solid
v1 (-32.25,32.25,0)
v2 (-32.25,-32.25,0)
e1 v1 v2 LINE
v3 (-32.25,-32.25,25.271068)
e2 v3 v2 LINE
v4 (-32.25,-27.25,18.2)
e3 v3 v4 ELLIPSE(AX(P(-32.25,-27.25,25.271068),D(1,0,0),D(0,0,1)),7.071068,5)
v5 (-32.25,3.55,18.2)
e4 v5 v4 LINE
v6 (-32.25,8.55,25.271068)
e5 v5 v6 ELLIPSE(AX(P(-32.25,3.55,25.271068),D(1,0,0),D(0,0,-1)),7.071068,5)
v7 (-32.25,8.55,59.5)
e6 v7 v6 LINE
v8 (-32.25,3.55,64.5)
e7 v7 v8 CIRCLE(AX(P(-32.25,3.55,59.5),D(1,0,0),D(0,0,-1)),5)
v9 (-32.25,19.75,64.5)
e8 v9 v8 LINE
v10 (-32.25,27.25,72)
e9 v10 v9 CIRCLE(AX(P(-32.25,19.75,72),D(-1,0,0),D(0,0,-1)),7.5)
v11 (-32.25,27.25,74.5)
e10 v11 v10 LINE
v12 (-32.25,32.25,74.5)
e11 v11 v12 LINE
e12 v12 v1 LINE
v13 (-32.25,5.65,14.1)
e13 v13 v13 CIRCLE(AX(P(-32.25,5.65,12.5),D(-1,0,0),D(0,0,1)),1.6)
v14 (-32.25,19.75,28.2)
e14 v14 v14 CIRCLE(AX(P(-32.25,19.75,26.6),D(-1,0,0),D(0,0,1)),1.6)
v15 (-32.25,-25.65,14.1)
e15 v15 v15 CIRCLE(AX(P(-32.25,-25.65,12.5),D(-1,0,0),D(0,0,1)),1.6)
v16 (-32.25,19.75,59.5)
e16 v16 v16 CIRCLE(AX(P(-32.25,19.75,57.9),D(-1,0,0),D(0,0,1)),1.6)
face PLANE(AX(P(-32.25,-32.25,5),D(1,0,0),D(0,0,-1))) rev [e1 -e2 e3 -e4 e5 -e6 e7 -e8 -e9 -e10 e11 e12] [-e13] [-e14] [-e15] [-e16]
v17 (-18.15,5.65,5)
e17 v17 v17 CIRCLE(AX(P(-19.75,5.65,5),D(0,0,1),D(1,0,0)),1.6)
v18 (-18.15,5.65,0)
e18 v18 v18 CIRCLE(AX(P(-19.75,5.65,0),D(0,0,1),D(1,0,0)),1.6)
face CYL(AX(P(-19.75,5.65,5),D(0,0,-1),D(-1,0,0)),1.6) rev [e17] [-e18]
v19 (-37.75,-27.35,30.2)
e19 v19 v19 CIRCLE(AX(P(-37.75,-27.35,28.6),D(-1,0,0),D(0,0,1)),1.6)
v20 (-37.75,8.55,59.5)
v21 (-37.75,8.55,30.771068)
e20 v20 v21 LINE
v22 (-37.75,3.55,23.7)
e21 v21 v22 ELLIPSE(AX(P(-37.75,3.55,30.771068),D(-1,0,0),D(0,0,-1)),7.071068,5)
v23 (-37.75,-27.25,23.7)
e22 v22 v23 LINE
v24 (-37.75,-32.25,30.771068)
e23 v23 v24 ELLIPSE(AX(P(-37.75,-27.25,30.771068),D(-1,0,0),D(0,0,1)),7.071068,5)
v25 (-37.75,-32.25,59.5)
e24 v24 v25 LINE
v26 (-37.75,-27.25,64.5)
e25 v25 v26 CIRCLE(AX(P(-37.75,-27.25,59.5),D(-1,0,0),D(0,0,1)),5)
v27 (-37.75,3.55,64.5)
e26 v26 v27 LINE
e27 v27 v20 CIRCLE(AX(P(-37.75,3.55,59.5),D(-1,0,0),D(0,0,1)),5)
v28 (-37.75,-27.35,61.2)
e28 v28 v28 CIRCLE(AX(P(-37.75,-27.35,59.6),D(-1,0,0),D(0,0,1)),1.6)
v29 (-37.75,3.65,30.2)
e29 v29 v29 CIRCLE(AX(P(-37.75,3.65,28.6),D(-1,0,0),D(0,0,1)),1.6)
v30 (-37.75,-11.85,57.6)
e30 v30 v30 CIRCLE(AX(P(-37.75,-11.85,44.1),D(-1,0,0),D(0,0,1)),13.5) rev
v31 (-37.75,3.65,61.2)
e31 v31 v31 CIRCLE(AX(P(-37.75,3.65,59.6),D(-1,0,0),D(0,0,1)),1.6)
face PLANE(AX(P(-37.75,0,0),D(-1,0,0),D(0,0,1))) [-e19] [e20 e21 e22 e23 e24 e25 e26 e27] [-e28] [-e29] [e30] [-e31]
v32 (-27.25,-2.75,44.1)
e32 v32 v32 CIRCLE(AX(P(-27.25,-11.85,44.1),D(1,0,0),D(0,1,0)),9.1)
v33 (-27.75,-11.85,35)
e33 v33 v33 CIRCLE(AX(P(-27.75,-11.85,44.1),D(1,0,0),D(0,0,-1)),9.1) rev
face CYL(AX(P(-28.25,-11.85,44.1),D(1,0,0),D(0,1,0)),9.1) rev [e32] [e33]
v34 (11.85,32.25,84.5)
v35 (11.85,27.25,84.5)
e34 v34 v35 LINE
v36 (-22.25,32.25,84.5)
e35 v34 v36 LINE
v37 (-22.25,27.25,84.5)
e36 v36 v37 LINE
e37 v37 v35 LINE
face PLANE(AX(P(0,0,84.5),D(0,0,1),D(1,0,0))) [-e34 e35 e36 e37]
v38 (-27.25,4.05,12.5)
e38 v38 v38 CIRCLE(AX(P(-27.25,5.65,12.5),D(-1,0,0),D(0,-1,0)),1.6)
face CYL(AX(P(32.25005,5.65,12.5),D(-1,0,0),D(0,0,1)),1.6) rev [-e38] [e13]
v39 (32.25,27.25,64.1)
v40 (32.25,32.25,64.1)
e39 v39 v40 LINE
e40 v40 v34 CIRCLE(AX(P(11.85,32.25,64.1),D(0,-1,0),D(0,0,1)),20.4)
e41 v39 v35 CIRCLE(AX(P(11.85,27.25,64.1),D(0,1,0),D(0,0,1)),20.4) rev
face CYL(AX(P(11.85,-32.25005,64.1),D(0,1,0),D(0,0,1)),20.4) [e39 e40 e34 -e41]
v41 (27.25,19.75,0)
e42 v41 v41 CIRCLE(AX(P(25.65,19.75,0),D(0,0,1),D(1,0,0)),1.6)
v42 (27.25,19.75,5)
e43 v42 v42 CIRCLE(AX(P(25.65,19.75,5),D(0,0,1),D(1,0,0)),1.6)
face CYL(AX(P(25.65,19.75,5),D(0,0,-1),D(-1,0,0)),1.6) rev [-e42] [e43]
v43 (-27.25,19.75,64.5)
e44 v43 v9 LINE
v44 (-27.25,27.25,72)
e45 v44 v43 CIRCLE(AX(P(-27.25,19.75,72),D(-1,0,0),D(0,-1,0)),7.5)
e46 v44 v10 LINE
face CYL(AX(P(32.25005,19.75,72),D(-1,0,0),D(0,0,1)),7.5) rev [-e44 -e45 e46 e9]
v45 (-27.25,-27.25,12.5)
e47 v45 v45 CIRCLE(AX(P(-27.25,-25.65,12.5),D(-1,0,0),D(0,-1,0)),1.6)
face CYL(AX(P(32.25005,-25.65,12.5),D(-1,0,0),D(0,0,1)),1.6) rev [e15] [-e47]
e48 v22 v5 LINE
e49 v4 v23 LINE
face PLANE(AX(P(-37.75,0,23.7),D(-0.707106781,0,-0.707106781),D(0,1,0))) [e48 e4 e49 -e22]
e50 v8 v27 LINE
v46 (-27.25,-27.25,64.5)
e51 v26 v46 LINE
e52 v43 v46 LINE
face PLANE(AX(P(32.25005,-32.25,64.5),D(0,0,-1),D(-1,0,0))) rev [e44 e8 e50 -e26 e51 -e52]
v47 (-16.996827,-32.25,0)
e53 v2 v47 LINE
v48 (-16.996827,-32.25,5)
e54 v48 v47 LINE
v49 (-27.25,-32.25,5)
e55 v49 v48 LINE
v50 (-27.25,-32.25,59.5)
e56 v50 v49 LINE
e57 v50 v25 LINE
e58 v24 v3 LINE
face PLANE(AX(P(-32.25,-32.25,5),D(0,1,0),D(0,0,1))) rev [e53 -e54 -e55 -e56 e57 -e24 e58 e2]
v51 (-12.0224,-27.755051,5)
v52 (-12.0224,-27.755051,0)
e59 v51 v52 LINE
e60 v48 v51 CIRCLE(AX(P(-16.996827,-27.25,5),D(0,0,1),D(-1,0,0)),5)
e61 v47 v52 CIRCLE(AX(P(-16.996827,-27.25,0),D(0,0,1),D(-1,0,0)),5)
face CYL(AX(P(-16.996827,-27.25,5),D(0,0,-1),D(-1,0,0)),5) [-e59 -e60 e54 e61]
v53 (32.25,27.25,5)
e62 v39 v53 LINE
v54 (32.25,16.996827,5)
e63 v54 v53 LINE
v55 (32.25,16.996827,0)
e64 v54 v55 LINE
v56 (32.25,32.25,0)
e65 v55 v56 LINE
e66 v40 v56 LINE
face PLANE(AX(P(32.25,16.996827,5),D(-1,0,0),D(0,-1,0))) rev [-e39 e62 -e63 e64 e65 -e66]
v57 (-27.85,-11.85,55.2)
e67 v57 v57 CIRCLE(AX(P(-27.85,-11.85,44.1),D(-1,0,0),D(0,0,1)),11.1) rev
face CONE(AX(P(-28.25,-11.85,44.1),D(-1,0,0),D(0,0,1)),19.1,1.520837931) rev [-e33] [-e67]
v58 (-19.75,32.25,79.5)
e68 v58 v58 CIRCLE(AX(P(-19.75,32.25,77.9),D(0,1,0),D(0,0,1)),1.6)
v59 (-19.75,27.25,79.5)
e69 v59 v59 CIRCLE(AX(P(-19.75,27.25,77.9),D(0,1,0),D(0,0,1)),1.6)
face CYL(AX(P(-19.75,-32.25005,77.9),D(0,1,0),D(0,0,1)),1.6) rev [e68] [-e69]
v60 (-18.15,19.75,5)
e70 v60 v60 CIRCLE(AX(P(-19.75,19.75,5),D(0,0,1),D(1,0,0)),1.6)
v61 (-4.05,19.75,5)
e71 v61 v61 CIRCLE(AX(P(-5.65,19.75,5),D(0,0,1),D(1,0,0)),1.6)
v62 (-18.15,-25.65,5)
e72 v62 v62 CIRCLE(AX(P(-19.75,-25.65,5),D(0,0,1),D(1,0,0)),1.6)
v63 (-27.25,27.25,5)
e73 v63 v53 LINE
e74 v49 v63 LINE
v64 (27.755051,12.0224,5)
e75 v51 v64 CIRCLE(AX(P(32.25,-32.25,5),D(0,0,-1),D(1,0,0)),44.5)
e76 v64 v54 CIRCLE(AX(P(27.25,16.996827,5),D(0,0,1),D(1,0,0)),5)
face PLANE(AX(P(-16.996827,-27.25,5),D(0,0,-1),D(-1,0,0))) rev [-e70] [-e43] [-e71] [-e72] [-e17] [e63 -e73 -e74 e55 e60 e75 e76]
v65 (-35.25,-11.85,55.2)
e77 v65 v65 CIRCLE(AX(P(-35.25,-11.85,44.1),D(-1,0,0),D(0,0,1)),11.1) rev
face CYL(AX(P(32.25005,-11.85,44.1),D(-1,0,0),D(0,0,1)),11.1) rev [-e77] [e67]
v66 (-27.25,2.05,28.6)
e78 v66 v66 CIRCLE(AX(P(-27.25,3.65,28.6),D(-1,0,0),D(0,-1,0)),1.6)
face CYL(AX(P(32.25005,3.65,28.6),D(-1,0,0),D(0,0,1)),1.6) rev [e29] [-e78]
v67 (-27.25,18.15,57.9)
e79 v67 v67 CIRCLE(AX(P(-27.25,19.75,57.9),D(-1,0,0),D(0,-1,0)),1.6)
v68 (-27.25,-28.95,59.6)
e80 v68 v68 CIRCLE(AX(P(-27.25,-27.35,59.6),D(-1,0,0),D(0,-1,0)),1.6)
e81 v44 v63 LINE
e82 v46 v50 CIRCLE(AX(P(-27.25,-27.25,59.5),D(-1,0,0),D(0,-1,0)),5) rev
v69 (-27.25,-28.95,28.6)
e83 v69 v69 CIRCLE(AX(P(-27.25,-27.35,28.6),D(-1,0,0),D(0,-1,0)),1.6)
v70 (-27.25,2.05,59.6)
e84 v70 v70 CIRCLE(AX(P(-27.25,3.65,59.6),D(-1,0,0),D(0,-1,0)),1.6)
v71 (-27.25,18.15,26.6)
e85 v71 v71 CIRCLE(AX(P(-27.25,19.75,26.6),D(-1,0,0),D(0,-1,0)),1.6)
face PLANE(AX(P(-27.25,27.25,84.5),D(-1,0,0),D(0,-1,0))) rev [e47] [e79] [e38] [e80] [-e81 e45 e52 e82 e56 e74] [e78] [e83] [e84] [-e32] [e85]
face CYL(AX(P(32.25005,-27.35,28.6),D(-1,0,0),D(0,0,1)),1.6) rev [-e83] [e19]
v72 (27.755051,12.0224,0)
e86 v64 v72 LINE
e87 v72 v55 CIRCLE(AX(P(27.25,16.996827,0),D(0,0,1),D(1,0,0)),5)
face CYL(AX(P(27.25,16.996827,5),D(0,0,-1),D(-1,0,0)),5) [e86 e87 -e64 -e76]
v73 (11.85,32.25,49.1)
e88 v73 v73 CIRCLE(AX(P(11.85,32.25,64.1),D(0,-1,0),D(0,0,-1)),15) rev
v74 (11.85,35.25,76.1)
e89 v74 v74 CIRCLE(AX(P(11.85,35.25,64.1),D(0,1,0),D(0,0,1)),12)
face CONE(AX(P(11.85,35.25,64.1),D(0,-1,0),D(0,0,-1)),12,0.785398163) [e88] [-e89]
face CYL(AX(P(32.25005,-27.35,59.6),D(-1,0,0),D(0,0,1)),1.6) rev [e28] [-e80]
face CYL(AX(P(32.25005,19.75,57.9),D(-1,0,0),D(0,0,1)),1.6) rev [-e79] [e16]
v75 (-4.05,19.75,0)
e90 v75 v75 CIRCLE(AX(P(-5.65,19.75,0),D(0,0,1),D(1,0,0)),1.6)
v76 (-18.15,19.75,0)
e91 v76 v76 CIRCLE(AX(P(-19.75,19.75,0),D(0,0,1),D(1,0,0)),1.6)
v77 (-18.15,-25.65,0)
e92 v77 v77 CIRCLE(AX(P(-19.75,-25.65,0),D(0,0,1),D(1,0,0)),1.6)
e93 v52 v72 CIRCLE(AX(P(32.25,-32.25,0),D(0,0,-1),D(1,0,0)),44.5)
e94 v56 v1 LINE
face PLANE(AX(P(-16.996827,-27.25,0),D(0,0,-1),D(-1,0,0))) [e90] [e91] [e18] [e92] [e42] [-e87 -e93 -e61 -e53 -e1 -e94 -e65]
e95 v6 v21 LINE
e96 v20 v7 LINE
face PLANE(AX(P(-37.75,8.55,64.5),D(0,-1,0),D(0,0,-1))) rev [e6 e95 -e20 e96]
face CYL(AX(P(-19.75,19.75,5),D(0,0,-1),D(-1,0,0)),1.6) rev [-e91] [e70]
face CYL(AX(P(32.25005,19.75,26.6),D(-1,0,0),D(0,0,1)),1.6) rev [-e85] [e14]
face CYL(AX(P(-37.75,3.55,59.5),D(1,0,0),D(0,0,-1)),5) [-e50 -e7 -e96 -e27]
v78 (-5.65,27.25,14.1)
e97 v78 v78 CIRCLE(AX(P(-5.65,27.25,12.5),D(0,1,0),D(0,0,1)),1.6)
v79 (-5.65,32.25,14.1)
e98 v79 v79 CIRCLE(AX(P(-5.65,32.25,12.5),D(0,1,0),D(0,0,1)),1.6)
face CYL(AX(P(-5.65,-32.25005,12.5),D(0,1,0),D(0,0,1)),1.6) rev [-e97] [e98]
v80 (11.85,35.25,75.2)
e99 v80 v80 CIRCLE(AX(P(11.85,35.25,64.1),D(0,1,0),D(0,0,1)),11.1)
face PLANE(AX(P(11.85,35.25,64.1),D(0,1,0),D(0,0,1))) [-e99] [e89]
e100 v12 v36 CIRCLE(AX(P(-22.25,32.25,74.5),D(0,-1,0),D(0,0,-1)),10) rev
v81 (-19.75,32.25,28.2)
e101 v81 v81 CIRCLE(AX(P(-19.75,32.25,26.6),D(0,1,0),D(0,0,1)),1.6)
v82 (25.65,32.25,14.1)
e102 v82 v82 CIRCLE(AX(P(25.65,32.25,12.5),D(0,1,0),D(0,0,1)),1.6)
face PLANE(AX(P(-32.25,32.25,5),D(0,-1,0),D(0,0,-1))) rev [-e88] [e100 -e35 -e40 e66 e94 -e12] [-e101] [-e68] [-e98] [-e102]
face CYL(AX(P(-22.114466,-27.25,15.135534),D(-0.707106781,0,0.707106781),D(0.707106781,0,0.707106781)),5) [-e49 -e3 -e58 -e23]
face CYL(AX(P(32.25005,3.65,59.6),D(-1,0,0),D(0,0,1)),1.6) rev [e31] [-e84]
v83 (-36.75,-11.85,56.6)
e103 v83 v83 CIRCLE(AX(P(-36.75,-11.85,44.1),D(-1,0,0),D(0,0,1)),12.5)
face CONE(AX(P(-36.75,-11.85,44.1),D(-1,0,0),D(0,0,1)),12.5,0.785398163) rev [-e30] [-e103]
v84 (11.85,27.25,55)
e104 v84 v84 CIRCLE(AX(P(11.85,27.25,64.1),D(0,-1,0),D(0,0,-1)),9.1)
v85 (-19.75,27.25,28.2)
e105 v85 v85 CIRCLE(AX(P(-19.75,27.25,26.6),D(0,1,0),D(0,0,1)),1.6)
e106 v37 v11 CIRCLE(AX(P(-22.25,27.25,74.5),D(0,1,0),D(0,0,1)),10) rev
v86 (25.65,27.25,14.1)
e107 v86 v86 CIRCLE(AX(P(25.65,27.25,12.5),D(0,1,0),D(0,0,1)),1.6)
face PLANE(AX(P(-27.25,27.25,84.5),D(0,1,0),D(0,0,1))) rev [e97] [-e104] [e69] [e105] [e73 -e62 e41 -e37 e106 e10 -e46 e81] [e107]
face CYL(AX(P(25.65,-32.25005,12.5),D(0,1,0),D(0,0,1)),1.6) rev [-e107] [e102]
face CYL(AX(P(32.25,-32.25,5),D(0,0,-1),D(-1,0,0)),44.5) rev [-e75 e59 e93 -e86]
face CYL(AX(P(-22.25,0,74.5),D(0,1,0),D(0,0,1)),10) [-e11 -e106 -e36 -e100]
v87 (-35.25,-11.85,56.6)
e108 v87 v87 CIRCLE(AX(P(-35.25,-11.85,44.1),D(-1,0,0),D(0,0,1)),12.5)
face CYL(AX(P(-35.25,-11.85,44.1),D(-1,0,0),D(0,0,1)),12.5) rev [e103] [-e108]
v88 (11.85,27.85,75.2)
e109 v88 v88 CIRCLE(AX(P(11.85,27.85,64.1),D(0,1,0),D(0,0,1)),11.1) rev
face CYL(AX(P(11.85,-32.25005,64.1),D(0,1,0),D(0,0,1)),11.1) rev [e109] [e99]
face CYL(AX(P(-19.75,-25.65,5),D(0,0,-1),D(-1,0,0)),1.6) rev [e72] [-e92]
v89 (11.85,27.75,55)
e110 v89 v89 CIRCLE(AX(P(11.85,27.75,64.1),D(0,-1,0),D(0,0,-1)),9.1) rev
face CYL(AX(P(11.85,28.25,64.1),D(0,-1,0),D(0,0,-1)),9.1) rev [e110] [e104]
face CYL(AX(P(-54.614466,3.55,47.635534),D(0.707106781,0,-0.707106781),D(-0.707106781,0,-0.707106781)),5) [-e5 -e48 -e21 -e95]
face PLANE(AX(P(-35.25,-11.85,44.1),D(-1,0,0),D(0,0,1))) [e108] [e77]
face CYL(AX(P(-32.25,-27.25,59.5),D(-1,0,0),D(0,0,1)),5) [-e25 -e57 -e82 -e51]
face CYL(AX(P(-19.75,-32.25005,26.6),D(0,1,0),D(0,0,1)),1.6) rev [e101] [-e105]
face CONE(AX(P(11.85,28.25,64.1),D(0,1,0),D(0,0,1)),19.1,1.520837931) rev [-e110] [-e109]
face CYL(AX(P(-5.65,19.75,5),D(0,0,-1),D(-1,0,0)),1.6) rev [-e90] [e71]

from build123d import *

# Parameters (mm, degrees)
SKETCH1_R           = 1.6
BOSS_EXTRUDE1_DEPTH = 5
BOSS_EXTRUDE2_DEPTH = 79.5
SKETCH3_R           = 11.1
CUT_EXTRUDE1_DEPTH  = 112.08808442
BOSS_EXTRUDE3_START = 3
SKETCH4_R           = 15
SKETCH4_R_2         = 11.1
BOSS_EXTRUDE3_DEPTH = 3
CHAMFER1_SIZE       = 3
BOSS_EXTRUDE4_START = -1
SKETCH5_R           = 11.1
SKETCH5_R_2         = 9.1
BOSS_EXTRUDE4_DEPTH = 1
CHAMFER2_SIZE       = 10
CHAMFER2_SIZE_2     = 0.5
SKETCH6_R           = 1.6
CUT_EXTRUDE2_DEPTH  = 112.08808442
SKETCH7_R           = 11.1
SKETCH7_R_2         = 1.6
CUT_EXTRUDE3_DEPTH  = 112.995814654
BOSS_EXTRUDE5_START = -1
SKETCH8_R           = 11.1
SKETCH8_R_2         = 9.1
BOSS_EXTRUDE5_DEPTH = 1
CHAMFER3_SIZE       = 10
CHAMFER3_SIZE_2     = 0.5
BOSS_EXTRUDE6_START = 5.5
SKETCH9_R           = 1.6
SKETCH9_R_2         = 11.1
BOSS_EXTRUDE6_DEPTH = 5.5
SKETCH10_R          = 12.5
CUT_EXTRUDE4_DEPTH  = 2.5
CHAMFER6_SIZE       = 1
CHAMFER5_SIZE       = 5.5
FILLET4_R           = 5
FILLET5_R           = 5
FILLET6_R           = 5
FILLET7_R           = 5
FILLET1_R           = 10


# Some blends are built 0.0001 mm under size
with BuildPart() as part:
    # Sketch1 → Boss-Extrude1 (new body)
    with BuildSketch(Plane.XY):
        with BuildLine():
            Line((-32.25, -32.25), (-16.996827309, -32.25))
            ThreePointArc((-16.996827309, -32.25), (-13.644608083, -30.959801378), (-12.022400308, -27.755050505))
            ThreePointArc((-12.022400308, -27.755050505), (0.783748237, -0.783748237), (27.755050505, 12.022400308))
            ThreePointArc((27.755050505, 12.022400308), (30.959801378, 13.644608083), (32.25, 16.996827309))
            Line((32.25, 16.996827309), (32.25, 32.25))
            Line((32.25, 32.25), (-32.25, 32.25))
            Line((-32.25, 32.25), (-32.25, -32.25))
        make_face()
        with Locations((-19.75, 19.75)):
            Circle(SKETCH1_R, mode=Mode.SUBTRACT)
        with Locations((-5.65, 19.75)):
            Circle(SKETCH1_R, mode=Mode.SUBTRACT)
        with Locations((25.65, 19.75)):
            Circle(SKETCH1_R, mode=Mode.SUBTRACT)
        with Locations((-19.75, 5.65)):
            Circle(SKETCH1_R, mode=Mode.SUBTRACT)
        with Locations((-19.75, -25.65)):
            Circle(SKETCH1_R, mode=Mode.SUBTRACT)
    extrude(amount=BOSS_EXTRUDE1_DEPTH)

    # Sketch2 → Boss-Extrude2 (add)
    with BuildSketch(Plane.XY.offset(5)):
        Polygon((-32.25, 32.25), (32.25, 32.25), (32.25, 27.25), (-27.25, 27.25), (-27.25, -32.25), (-32.25, -32.25), (-32.25, 27.25), align=None)
    extrude(amount=BOSS_EXTRUDE2_DEPTH)

    # Sketch3 → Cut-Extrude1 (cut, through all)
    with BuildSketch(Plane(origin=(0, 32.25, 0), x_dir=(1, 0, 0), z_dir=(0, 1, 0))):
        with Locations(Location((11.85, -64.1, 0), (0, 0, 270))):
            Circle(SKETCH3_R)
        with BuildLine():
            Line((11.85, -84.5), (11.85, -91.476631288))
            Line((11.85, -91.476631288), (44.100409765, -91.476631288))
            Line((44.100409765, -91.476631288), (44.100409765, -64.1))
            Line((44.100409765, -64.1), (32.25, -64.1))
            ThreePointArc((32.25, -64.1), (26.274978336, -78.524978336), (11.85, -84.5))
        make_face()
    extrude(amount=-CUT_EXTRUDE1_DEPTH, mode=Mode.SUBTRACT)

    # Sketch4 → Boss-Extrude3 (add)
    with BuildSketch(Plane(origin=(0, 32.25, 0), x_dir=(1, 0, 0), z_dir=(0, 1, 0)).offset(BOSS_EXTRUDE3_START)):
        with Locations(Location((11.85, -64.1, 0), (0, 0, 90))):
            Circle(SKETCH4_R)
        with Locations(Location((11.85, -64.1, 0), (0, 0, 270))):
            Circle(SKETCH4_R_2, mode=Mode.SUBTRACT)
    extrude(amount=-BOSS_EXTRUDE3_DEPTH)

    # Chamfer1
    chamfer1_edges = [part.edges().sort_by_distance(p)[0] for p in [
        (11.85, 35.25, 79.1),
    ]]
    chamfer(chamfer1_edges, length=CHAMFER1_SIZE - 0.0001)  # a hair under: the kernel refuses the full size

    # Sketch5 → Boss-Extrude4 (add)
    with BuildSketch(Plane.XZ.offset(-27.25).offset(BOSS_EXTRUDE4_START)):
        with Locations(Location((11.85, 64.1, 0), (0, 0, 90))):
            Circle(SKETCH5_R)
        with Locations(Location((11.85, 64.1, 0), (0, 0, 270))):
            Circle(SKETCH5_R_2, mode=Mode.SUBTRACT)
    extrude(amount=BOSS_EXTRUDE4_DEPTH)

    # Chamfer2
    # the kernel refuses this chamfer: 10, 0.5 mm, written as the material it takes off along each edge
    with BuildSketch(Plane(origin=(11.85, 28.25, 64.1), x_dir=(0, 0, -1), z_dir=(-1, 0, 0))) as chamfer2_piece_1_section:
        Polygon((9.1 + CHAMFER2_SIZE, 0), (9.1, CHAMFER2_SIZE_2), (9.1, 0), align=None)
    chamfer2_piece_1 = revolve(axis=Axis((11.85, 28.25, 64.1), (0, -1, 0)), mode=Mode.PRIVATE)
    chamfer2_piece_1 = chamfer2_piece_1 & Plane(origin=(11.85, 27.834786479, 64.1), x_dir=(0, 0, 1), z_dir=(0, 1, 0)) * Cylinder(11.1, 77, mode=Mode.PRIVATE)
    add(chamfer2_piece_1, mode=Mode.SUBTRACT)

    # Sketch6 → Cut-Extrude2 (cut, through all)
    with BuildSketch(Plane(origin=(0, 32.25, 0), x_dir=(1, 0, 0), z_dir=(0, 1, 0))):
        with Locations(Location((-19.75, -26.6, 0), (0, 0, 270))):
            Circle(SKETCH6_R)
        with Locations(Location((-19.75, -77.9, 0), (0, 0, 270))):
            Circle(SKETCH6_R)
        with Locations(Location((-5.65, -12.5, 0), (0, 0, 270))):
            Circle(SKETCH6_R)
        with Locations(Location((25.65, -12.5, 0), (0, 0, 270))):
            Circle(SKETCH6_R)
    extrude(amount=-CUT_EXTRUDE2_DEPTH, mode=Mode.SUBTRACT)

    # Sketch7 → Cut-Extrude3 (cut, through all)
    with BuildSketch(Plane.ZY.offset(32.25)):
        with Locations((44.1, -11.85)):
            Circle(SKETCH7_R)
        with Locations((28.6, -27.35)):
            Circle(SKETCH7_R_2)
        with Locations((57.9, 19.75)):
            Circle(SKETCH7_R_2)
        with Locations((26.6, 19.75)):
            Circle(SKETCH7_R_2)
        with Locations((12.5, 5.65)):
            Circle(SKETCH7_R_2)
        with Locations((12.5, -25.65)):
            Circle(SKETCH7_R_2)
        with Locations((28.6, 3.65)):
            Circle(SKETCH7_R_2)
        with Locations((59.6, 3.65)):
            Circle(SKETCH7_R_2)
        with Locations((59.6, -27.35)):
            Circle(SKETCH7_R_2)
        with BuildLine():
            Line((64.5, -32.25), (64.5, 19.75))
            ThreePointArc((64.5, 19.75), (66.696699141, 25.053300859), (72, 27.25))
            Line((72, 27.25), (84.5, 27.25))
            Line((84.5, 27.25), (84.5, -32.25))
            Line((84.5, -32.25), (64.5, -32.25))
        make_face()
    extrude(amount=-CUT_EXTRUDE3_DEPTH, mode=Mode.SUBTRACT)

    # Sketch8 → Boss-Extrude5 (add)
    with BuildSketch(Plane(origin=(-27.25, 0, 0), x_dir=(0, 0, -1), z_dir=(1, 0, 0)).offset(BOSS_EXTRUDE5_START)):
        with Locations(Location((-44.1, -11.85, 0), (0, 0, 180))):
            Circle(SKETCH8_R)
        with Locations(Location((-44.1, -11.85, 0), (0, 0, 90))):
            Circle(SKETCH8_R_2, mode=Mode.SUBTRACT)
    extrude(amount=BOSS_EXTRUDE5_DEPTH)

    # Chamfer3
    # the kernel refuses this chamfer: 10, 0.5 mm, written as the material it takes off along each edge
    with BuildSketch(Plane(origin=(-28.25, -11.85, 44.1), x_dir=(0, 1, 0), z_dir=(0, 0, -1))) as chamfer3_piece_1_section:
        Polygon((9.1 + CHAMFER3_SIZE, 0), (9.1, CHAMFER3_SIZE_2), (9.1, 0), align=None)
    chamfer3_piece_1 = revolve(axis=Axis((-28.25, -11.85, 44.1), (1, 0, 0)), mode=Mode.PRIVATE)
    chamfer3_piece_1 = chamfer3_piece_1 & Plane(origin=(-27.834786479, -11.85, 44.1), x_dir=(0, 0, 1), z_dir=(-1, 0, 0)) * Cylinder(11.1, 77, mode=Mode.PRIVATE)
    add(chamfer3_piece_1, mode=Mode.SUBTRACT)

    # Sketch9 → Boss-Extrude6 (add)
    with BuildSketch(Plane.ZY.offset(32.25).offset(BOSS_EXTRUDE6_START)):
        Polygon((64.5, -32.25), (23.7, -32.25), (18.2, -32.25), (18.2, 8.55), (23.7, 8.55), (64.5, 8.55), align=None)
        with Locations((28.6, -27.35)):
            Circle(SKETCH9_R, mode=Mode.SUBTRACT)
        with Locations((28.6, 3.65)):
            Circle(SKETCH9_R, mode=Mode.SUBTRACT)
        with Locations((44.1, -11.85)):
            Circle(SKETCH9_R_2, mode=Mode.SUBTRACT)
        with Locations((59.6, 3.65)):
            Circle(SKETCH9_R, mode=Mode.SUBTRACT)
        with Locations((59.6, -27.35)):
            Circle(SKETCH9_R, mode=Mode.SUBTRACT)
    extrude(amount=-BOSS_EXTRUDE6_DEPTH)

    # Sketch10 → Cut-Extrude4 (cut)
    with BuildSketch(Plane.ZY.offset(37.75)):
        with Locations((44.1, -11.85)):
            Circle(SKETCH10_R)
    extrude(amount=-CUT_EXTRUDE4_DEPTH, mode=Mode.SUBTRACT)

    # Chamfer6
    chamfer6_edges = [part.edges().sort_by_distance(p)[0] for p in [
        (-37.75, -11.85, 31.6),
    ]]
    chamfer(chamfer6_edges, length=CHAMFER6_SIZE)

    # Chamfer5
    chamfer5_edges = [part.edges().sort_by_distance(p)[0] for p in [
        (-37.75, -11.85, 18.2),
    ]]
    chamfer(chamfer5_edges, length=CHAMFER5_SIZE - 0.0001)  # a hair under: the kernel refuses the full size

    # Fillet4
    fillet4_edges = [part.edges().sort_by_distance(p)[0] for p in [
        (-32.5, -32.25, 64.5),
    ]]
    fillet(fillet4_edges, radius=FILLET4_R)

    # Fillet5
    fillet5_edges = [part.edges().sort_by_distance(p)[0] for p in [
        (-35, 8.55, 64.5),
    ]]
    fillet(fillet5_edges, radius=FILLET5_R)

    # Fillet6
    fillet6_edges = [part.edges().sort_by_distance(p)[0] for p in [
        (-35.00005, 8.55, 20.94995),
    ]]
    fillet(fillet6_edges, radius=FILLET6_R)

    # Fillet7
    # the kernel refuses this fillet: 5 mm, written as the material it takes off along each edge
    with BuildSketch(Plane(origin=(-46.588834765, -32.25, 32.538734765), x_dir=(0, 1, 0), z_dir=(0.7071067811865478, 0, -0.7071067811865474))) as fillet7_piece_1_section:
        with BuildLine():
            CenterArc((FILLET7_R, FILLET7_R), FILLET7_R, 180, 90)
            Line((0, FILLET7_R), (0, 0))
            Line((0, 0), (FILLET7_R, 0))
        make_face()
    fillet7_piece_1 = extrude(amount=32.778033172, mode=Mode.PRIVATE)
    fillet7_piece_1 = split(fillet7_piece_1, bisect_by=Plane(origin=(-32.25, -31.133160306, 22.529349846), z_dir=(-1, 0, 0)), keep=Keep.TOP, mode=Mode.PRIVATE)
    add(fillet7_piece_1, mode=Mode.SUBTRACT)

    # Fillet1
    fillet1_edges = [part.edges().sort_by_distance(p)[0] for p in [
        (-32.25, 29.75, 84.5),
    ]]
    fillet(fillet1_edges, radius=FILLET1_R)


solid = part.part
